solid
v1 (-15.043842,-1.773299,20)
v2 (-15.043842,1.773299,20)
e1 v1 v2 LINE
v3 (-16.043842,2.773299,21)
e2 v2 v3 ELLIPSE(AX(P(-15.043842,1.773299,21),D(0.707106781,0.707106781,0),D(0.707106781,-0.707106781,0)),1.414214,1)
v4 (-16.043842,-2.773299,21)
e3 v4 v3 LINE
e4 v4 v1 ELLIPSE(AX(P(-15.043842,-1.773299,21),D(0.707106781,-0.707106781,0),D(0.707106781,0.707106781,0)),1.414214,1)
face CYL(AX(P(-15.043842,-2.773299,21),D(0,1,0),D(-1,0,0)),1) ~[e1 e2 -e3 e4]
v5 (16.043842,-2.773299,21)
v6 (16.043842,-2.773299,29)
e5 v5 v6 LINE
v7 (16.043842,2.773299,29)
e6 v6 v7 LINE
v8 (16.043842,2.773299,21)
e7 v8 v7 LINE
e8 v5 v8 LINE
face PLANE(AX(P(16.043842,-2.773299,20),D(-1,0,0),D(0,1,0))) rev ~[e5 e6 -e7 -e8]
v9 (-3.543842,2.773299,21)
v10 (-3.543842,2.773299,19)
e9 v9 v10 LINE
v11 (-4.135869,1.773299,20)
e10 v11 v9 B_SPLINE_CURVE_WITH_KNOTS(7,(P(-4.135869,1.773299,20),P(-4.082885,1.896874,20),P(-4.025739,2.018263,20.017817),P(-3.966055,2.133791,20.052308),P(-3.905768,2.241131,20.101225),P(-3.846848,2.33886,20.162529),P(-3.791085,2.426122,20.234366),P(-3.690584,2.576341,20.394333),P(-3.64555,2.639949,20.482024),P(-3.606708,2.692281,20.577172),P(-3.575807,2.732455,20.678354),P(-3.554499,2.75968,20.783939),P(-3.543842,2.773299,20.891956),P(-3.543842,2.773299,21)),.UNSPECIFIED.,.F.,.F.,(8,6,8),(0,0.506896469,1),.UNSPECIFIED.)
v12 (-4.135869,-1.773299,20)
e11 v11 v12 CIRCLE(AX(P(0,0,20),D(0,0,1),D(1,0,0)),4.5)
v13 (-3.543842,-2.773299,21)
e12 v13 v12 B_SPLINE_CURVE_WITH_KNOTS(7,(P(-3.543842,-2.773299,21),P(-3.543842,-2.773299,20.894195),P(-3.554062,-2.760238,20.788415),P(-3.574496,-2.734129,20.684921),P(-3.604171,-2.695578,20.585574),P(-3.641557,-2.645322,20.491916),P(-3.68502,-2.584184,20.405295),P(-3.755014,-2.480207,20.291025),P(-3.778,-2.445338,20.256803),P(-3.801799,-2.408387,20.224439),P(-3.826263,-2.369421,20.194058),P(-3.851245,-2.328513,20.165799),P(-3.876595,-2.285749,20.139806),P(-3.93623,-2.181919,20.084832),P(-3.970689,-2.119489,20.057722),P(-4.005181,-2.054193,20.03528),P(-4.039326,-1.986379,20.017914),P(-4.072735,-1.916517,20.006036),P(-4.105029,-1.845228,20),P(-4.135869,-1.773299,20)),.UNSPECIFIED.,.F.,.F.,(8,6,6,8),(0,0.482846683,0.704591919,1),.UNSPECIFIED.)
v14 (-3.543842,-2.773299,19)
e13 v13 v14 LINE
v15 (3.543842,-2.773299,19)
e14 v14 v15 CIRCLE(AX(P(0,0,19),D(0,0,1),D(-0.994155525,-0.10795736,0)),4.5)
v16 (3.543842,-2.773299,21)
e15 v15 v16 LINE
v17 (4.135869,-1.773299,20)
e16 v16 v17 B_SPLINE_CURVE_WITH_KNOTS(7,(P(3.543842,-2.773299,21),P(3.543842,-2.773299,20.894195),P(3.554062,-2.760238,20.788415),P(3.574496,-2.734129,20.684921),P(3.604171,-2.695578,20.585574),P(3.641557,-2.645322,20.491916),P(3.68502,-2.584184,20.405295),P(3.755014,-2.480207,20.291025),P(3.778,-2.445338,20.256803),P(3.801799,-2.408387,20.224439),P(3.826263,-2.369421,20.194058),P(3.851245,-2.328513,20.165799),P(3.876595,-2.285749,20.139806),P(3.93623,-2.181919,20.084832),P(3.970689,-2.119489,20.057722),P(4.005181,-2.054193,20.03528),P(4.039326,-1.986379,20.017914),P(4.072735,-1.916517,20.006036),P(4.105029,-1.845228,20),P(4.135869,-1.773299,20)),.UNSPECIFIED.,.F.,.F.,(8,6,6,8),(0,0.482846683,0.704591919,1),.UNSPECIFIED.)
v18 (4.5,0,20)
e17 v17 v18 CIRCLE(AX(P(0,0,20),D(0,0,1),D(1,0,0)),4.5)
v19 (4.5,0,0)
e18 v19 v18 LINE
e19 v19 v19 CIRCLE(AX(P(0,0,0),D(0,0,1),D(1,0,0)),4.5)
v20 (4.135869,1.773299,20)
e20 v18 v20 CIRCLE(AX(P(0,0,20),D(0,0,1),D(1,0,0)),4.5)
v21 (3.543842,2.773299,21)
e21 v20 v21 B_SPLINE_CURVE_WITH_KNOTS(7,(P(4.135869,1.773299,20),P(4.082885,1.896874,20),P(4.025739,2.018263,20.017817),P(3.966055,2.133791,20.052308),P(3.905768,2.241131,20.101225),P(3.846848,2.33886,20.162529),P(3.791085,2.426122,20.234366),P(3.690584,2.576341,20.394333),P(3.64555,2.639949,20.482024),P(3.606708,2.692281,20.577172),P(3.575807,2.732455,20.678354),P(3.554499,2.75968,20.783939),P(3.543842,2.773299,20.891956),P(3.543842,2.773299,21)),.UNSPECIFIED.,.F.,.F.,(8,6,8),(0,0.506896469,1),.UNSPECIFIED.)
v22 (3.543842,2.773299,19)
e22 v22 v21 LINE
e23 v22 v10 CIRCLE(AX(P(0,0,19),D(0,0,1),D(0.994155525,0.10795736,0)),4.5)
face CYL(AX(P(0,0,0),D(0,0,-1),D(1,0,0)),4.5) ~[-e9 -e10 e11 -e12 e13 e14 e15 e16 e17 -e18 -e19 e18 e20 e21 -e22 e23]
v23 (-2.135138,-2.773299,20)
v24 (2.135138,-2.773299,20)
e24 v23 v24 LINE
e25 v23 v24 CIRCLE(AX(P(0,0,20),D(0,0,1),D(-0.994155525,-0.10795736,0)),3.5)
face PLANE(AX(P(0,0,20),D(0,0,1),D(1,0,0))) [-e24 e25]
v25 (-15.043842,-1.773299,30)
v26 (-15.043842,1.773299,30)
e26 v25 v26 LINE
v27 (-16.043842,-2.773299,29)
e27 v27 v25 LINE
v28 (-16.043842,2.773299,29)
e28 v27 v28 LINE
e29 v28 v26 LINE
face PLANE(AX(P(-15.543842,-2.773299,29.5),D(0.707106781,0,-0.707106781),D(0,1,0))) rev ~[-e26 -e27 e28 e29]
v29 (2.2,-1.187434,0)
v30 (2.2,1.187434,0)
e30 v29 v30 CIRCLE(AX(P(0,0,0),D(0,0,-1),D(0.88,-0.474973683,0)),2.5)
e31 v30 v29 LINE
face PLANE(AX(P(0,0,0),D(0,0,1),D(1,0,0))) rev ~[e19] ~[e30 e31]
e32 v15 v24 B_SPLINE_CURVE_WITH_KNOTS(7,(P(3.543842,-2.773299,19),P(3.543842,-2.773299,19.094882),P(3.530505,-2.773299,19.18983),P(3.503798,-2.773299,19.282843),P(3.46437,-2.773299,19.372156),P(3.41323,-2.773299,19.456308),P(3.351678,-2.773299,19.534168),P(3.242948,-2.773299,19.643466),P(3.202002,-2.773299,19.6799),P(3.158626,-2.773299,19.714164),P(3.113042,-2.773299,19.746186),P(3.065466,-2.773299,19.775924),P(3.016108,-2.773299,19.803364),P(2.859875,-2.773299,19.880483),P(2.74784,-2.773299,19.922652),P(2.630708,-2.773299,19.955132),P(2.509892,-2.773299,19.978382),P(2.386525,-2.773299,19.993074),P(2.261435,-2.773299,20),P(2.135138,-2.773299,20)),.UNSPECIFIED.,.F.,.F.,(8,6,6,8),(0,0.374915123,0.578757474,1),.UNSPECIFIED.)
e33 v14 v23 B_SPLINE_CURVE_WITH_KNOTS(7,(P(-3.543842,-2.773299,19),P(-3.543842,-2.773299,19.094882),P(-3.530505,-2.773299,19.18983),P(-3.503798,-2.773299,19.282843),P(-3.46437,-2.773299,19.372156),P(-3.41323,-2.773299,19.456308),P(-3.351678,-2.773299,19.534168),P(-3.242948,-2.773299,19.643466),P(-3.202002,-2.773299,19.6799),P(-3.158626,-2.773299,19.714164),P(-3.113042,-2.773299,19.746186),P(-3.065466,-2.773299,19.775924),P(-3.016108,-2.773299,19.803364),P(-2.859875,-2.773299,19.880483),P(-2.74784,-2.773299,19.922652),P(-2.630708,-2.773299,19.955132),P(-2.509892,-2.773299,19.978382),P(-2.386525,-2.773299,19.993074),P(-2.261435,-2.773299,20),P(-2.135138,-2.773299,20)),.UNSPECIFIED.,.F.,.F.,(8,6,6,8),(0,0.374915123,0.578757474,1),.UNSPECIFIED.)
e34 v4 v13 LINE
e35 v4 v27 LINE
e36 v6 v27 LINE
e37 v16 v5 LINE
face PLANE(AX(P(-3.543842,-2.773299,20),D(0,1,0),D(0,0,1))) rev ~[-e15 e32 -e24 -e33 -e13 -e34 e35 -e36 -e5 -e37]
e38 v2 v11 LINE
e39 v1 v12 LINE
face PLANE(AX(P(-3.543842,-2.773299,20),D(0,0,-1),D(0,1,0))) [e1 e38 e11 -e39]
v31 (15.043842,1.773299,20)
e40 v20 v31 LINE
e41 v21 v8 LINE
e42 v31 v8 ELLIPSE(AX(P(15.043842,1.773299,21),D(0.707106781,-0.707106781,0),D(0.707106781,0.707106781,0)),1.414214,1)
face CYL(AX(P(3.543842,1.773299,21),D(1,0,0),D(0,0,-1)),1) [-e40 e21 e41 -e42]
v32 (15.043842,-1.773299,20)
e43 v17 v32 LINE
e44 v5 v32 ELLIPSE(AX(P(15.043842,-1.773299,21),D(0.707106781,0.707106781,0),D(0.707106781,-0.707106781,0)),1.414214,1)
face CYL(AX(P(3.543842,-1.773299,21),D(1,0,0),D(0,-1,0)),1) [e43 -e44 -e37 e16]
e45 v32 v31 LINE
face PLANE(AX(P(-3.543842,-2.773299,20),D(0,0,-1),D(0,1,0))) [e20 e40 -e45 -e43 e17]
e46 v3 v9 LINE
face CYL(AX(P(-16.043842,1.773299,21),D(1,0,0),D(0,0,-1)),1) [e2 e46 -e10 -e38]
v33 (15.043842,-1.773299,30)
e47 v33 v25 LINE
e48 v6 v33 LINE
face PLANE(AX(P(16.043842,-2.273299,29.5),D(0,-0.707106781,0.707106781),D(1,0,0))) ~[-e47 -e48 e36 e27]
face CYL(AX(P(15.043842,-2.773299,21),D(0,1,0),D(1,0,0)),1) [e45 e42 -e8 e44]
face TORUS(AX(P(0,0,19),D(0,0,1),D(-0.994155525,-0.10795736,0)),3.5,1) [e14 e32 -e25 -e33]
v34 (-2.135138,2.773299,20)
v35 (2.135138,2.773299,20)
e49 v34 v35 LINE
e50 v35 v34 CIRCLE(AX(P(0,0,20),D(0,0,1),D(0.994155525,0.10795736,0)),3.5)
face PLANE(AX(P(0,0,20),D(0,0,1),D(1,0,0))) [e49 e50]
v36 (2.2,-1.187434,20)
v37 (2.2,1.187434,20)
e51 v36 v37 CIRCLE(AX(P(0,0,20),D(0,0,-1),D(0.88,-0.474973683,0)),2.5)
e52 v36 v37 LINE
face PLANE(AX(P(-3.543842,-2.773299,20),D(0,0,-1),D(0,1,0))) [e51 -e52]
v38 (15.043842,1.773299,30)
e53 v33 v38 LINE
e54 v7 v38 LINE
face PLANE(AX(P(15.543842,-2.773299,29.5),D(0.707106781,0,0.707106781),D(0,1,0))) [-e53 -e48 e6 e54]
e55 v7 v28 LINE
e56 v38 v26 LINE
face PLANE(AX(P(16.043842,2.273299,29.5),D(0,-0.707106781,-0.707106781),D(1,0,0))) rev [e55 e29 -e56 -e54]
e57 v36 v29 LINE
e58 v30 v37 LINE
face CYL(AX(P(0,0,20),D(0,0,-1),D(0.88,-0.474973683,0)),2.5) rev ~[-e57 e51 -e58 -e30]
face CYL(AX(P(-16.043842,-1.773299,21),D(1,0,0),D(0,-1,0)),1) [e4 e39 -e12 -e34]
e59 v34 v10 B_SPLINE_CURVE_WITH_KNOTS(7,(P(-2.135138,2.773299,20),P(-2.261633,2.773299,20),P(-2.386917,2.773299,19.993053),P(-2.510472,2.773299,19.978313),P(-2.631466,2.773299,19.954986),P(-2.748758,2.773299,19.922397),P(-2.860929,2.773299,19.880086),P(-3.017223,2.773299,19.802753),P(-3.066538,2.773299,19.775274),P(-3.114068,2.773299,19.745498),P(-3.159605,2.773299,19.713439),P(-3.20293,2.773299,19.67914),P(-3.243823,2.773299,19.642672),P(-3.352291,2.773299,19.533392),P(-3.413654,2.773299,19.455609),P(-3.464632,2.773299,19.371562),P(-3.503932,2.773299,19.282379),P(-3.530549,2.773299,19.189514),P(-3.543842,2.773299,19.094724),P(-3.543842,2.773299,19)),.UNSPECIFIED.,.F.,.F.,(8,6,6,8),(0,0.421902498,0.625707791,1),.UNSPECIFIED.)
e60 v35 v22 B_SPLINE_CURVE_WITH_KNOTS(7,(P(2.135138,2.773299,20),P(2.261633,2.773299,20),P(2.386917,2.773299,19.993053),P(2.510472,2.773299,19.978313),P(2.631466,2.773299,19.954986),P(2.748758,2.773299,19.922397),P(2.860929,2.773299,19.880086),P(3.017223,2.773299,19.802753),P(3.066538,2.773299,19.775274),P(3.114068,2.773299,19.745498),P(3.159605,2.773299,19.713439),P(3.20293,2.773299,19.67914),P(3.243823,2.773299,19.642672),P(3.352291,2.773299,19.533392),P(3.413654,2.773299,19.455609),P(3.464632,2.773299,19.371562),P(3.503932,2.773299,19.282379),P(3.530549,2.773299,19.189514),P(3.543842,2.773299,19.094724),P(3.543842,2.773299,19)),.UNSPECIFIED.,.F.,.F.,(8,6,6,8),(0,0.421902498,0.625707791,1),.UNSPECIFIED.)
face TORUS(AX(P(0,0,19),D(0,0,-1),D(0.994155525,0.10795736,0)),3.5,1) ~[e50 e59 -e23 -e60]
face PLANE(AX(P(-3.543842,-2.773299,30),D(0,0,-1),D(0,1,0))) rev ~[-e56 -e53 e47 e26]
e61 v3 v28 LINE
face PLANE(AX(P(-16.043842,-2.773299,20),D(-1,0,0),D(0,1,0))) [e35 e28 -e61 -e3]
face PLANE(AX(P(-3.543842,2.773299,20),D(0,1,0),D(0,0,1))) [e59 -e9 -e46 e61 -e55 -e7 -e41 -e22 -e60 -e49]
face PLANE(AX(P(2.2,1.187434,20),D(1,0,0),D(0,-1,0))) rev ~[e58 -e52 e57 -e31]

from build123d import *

# Parameters (mm, degrees)
F0_R        = 4.5
F1_DEPTH    = 20
F2_W        = 7.0876832783
F2_H        = 5.546597673
F3_DEPTH    = 10
F4_DEPTH    = 12.5
F5_SIZE     = 1
F6_T4_ANGLE = 167.6048406122
F6_T9_ANGLE = 167.6048406122
F7_R        = 1


# Not quite as in the source:
# - a fillet or chamfer that OpenCascade refuses, or shapes differently, is made with other operations: its cross-section is extruded or revolved along the edge and cut away or added


with BuildPart() as f1:
    # F0 (on Top) → F1 (new body)
    with BuildSketch(Plane.XY):
        Circle(F0_R)
        with BuildLine():
            ThreePointArc((2.2, 1.1874342087), (2.4238399287, 0.6123724357), (2.5, 0))
            ThreePointArc((2.5, 0), (2.4238399287, -0.6123724357), (2.2, -1.1874342087))
            ThreePointArc((2.2, -1.1874342087), (-2.5, 0), (2.2, 1.1874342087))
        make_face(mode=Mode.SUBTRACT)
        with BuildLine():
            ThreePointArc((2.2, -1.1874342087), (2.4238399287, -0.6123724357), (2.5, 0))
            ThreePointArc((2.5, 0), (2.4238399287, 0.6123724357), (2.2, 1.1874342087))
            Line((2.2, 1.1874342087), (2.2, -1.1874342087))
        make_face()
    extrude(amount=F1_DEPTH)

    # F2 (on face) → F3 (join)
    with BuildSketch(Plane.XY.offset(20)):
        Rectangle(F2_W, F2_H)
        with BuildLine():
            Line((2.2, 1.1874342087), (2.2, -1.1874342087))
            ThreePointArc((2.2, -1.1874342087), (-2.5, 0), (2.2, 1.1874342087))
        make_face(mode=Mode.SUBTRACT)
    extrude(amount=F3_DEPTH)

    # F4 (add, symmetric): faces of the model
    f4_faces = [f1.faces().sort_by_distance(p)[0] for p in [
        (3.5438416392, 0, 25),
        (-3.5438416392, 0, 25),
    ]]
    extrude(f4_faces, amount=F4_DEPTH, both=True, dir=(1, 0, 0))

    # F5
    f5_edges = [f1.edges().sort_by_distance(p)[0] for p in [
        (0, -2.773299, 30),
        (0, 2.773299, 30),
        (16.043842, 0, 30),
        (-16.043842, 0, 30),
    ]]
    chamfer(f5_edges, length=F5_SIZE)

    # F6: fillet of radius 1 on 2 edges, made by hand


with BuildPart() as f6_tool2:
    # F6_s3 → F6_t4 (revolve)
    with BuildSketch(Plane(origin=(0, 0, 0), x_dir=(0, 0, 1), z_dir=(0.1079573604, -0.9941555252, 0))):
        with BuildLine():
            ThreePointArc((20, -3.5), (19.7071067812, -4.2071067812), (19, -4.5))
            Line((19, -4.5), (20, -4.5))
            Line((20, -4.5), (20, -3.5))
        make_face()
    revolve(axis=Axis((0, 0, 20), (0, 0, 1)), revolution_arc=F6_T4_ANGLE)

    split(bisect_by=Plane.XZ.offset(-2.7732988365), keep=Keep.BOTTOM)


with BuildPart() as f1_1:
    add(f1.part)

    # F6_t1: cut F6_tool2
    add(f6_tool2.part, mode=Mode.SUBTRACT)


with BuildPart() as f6_tool7:
    # F6_s8 → F6_t9 (revolve)
    with BuildSketch(Plane(origin=(0, 0, 0), x_dir=(0, 0, 1), z_dir=(-0.1079573604, 0.9941555252, 0))):
        with BuildLine():
            ThreePointArc((19, -4.5), (19.7071067812, -4.2071067812), (20, -3.5))
            Line((20, -3.5), (20, -4.5))
            Line((20, -4.5), (19, -4.5))
        make_face()
    revolve(axis=Axis((0, 0, 20), (0, 0, 1)), revolution_arc=F6_T9_ANGLE)

    split(bisect_by=Plane.XZ.offset(2.7732988365), keep=Keep.TOP)


with BuildPart() as f1_2:
    add(f1_1.part)

    # F6_t6: cut F6_tool7
    add(f6_tool7.part, mode=Mode.SUBTRACT)

    # F7
    f7_edges = [f1_2.edges().sort_by_distance(p)[0] for p in [
        (9.793842, 2.773299, 20),
        (-9.793842, 2.773299, 20),
        (9.793842, -2.773299, 20),
        (-9.793842, -2.773299, 20),
        (16.043842, 0, 20),
        (-16.043842, 0, 20),
    ]]
    fillet(f7_edges, radius=F7_R)


solid = f1_2.part
